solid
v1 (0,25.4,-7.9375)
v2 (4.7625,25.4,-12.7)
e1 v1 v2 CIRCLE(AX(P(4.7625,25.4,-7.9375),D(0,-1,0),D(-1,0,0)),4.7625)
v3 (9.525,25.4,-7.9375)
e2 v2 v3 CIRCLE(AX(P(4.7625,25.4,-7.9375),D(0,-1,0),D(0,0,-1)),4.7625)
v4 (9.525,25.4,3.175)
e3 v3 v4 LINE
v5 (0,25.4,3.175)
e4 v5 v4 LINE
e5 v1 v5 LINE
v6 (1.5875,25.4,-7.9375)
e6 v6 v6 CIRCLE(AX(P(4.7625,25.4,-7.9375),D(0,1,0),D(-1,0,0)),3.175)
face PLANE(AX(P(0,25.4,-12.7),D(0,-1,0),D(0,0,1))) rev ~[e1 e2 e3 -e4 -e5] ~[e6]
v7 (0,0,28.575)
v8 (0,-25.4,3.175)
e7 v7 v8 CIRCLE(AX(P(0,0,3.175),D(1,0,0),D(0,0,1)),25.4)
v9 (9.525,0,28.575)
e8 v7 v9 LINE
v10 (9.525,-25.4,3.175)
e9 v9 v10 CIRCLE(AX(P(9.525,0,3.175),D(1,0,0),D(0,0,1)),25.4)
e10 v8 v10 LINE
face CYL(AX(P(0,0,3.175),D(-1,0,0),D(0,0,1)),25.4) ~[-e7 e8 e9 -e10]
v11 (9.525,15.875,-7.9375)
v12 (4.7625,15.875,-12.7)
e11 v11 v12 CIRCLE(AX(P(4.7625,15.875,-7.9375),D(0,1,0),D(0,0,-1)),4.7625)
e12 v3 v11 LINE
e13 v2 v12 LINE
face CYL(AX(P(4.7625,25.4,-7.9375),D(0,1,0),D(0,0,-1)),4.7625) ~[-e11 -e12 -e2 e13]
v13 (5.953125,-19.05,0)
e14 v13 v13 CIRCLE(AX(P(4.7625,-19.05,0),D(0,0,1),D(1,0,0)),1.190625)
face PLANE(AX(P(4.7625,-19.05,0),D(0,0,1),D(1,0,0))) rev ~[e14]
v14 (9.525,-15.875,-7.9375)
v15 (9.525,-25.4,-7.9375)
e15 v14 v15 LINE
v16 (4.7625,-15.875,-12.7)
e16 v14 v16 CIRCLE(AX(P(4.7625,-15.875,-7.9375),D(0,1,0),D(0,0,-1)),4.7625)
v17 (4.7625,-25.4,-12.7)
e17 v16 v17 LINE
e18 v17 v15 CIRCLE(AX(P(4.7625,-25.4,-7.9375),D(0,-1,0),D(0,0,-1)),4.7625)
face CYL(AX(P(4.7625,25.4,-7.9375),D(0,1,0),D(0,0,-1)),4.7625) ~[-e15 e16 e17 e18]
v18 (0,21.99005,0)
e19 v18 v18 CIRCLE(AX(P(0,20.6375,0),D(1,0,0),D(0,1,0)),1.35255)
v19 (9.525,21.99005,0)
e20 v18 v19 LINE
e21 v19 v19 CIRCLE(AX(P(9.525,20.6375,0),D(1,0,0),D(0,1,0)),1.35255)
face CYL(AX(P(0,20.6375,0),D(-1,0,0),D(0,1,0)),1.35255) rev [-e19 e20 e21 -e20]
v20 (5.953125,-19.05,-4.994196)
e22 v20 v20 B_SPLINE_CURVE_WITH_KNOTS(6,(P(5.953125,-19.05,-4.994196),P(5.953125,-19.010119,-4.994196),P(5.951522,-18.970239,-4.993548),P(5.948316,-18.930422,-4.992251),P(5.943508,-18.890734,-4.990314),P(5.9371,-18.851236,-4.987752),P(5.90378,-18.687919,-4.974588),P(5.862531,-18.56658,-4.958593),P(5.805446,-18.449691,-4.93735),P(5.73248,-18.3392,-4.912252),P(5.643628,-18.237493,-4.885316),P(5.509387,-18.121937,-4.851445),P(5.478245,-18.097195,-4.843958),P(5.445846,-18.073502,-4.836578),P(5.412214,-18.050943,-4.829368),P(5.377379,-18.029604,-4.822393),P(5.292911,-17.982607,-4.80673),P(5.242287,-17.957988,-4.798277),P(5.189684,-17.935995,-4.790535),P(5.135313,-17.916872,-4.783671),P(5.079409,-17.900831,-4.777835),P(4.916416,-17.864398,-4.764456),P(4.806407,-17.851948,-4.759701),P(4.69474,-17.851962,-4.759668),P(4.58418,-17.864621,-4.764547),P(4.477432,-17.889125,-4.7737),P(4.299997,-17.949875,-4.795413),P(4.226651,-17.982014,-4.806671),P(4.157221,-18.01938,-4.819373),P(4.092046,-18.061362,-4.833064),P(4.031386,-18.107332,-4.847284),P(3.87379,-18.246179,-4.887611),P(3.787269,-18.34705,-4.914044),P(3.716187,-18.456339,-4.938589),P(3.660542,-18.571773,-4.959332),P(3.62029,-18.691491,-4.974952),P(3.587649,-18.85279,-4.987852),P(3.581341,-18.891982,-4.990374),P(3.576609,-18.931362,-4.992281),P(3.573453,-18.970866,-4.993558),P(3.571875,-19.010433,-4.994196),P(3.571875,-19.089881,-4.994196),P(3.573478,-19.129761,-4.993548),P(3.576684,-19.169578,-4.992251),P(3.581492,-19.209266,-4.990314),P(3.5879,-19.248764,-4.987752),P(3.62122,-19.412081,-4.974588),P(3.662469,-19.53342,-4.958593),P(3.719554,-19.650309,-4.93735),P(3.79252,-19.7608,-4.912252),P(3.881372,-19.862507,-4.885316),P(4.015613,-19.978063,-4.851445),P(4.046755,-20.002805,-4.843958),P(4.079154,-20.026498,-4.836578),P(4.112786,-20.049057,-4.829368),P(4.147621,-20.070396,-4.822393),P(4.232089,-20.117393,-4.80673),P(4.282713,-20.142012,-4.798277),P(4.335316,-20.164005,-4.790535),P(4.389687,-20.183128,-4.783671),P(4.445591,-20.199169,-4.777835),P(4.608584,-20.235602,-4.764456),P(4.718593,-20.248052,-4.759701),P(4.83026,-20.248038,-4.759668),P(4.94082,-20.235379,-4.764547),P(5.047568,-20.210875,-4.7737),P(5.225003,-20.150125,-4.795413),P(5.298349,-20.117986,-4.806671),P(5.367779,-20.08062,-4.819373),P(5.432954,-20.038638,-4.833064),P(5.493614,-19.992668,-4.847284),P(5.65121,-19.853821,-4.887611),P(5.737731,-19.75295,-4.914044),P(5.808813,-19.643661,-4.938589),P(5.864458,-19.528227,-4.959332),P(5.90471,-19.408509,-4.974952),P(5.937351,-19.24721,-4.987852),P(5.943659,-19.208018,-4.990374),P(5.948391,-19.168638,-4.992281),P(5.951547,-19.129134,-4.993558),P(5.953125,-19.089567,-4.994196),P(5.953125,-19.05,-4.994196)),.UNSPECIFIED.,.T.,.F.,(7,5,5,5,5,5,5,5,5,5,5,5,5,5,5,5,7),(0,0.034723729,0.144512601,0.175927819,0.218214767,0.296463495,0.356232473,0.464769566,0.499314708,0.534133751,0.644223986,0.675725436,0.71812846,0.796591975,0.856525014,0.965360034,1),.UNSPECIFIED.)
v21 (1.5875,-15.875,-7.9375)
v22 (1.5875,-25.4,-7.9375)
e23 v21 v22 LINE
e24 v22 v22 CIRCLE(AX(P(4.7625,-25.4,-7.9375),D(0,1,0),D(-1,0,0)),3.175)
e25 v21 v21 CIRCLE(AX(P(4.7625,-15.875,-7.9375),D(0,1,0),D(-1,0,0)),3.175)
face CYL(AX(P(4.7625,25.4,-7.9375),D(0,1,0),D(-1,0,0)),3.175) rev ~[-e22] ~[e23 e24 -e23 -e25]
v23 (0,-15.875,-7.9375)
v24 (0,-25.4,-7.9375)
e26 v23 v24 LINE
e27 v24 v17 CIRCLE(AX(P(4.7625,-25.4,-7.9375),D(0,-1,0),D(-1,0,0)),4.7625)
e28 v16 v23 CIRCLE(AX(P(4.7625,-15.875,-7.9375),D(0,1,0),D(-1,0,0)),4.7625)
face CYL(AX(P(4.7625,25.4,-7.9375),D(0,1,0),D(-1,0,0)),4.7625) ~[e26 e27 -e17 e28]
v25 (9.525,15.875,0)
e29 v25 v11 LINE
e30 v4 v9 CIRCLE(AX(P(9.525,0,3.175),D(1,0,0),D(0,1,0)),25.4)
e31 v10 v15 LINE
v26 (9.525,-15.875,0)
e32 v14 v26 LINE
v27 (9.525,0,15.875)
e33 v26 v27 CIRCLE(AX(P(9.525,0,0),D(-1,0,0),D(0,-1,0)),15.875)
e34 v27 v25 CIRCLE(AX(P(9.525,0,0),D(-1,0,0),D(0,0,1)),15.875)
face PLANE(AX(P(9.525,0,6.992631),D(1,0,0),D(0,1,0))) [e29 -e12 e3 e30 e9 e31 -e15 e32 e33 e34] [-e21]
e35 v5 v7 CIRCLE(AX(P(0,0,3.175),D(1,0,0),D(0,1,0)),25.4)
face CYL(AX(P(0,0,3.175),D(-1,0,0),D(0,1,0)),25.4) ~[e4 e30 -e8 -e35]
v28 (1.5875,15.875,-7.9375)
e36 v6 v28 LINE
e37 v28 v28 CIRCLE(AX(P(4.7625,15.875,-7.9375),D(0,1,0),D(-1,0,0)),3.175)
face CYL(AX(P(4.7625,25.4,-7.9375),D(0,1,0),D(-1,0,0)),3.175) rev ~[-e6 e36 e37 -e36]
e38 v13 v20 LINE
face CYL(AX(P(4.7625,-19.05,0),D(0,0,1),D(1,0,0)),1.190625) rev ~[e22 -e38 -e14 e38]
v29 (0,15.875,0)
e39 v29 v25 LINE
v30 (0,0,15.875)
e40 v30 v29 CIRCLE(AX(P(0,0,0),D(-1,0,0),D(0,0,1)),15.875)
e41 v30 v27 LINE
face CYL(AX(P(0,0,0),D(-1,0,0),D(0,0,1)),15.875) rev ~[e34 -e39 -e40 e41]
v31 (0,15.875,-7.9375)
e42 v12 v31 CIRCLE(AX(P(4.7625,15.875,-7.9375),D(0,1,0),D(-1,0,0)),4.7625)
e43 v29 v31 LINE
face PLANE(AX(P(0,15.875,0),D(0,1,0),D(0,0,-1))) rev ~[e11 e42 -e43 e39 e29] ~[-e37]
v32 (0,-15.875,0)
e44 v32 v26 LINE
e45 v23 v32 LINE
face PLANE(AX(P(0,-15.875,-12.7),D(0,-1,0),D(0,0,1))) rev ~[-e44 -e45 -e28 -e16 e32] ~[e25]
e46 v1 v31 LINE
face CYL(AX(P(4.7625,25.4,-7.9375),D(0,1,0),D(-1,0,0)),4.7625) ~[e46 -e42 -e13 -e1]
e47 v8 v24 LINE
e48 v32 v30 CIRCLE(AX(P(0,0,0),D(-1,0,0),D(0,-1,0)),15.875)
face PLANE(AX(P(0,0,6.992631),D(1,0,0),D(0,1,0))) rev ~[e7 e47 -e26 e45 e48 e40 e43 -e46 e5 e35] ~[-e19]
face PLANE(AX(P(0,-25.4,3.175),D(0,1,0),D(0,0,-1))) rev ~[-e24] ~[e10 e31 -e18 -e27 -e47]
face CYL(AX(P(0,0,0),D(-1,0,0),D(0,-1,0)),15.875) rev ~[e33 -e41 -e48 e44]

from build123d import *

# Parameters (mm, degrees)
F0_R     = 1.35255
F1_DEPTH = 9.525
F2_R     = 3.175
F3_DEPTH = 50.8
F4_R     = 1.190625
F5_DEPTH = 6.35


# Not quite as in the source:
# - a feature names something its author has since deleted; it is built from what else it names


with BuildPart() as f1:
    # F0 (on Right) → F1 (new body)
    with BuildSketch(Plane.YZ):
        with BuildLine():
            Line((-15.875, -12.7), (-15.875, 0))
            ThreePointArc((-15.875, 0), (-11.2253201513, 11.2253201513), (0, 15.875))
            ThreePointArc((0, 15.875), (11.2253201513, 11.2253201513), (15.875, 0))
            Line((15.875, 0), (15.875, -12.7))
            Line((15.875, -12.7), (25.4, -12.7))
            Line((25.4, -12.7), (25.4, 0))
            Line((25.4, 0), (25.4, 3.175))
            ThreePointArc((25.4, 3.175), (17.9605122421, 21.1355122421), (0, 28.575))
            ThreePointArc((0, 28.575), (-17.9605122421, 21.1355122421), (-25.4, 3.175))
            Line((-25.4, 3.175), (-25.4, 0))
            Line((-25.4, 0), (-25.4, -12.7))
            Line((-25.4, -12.7), (-15.875, -12.7))
        make_face()
        with Locations((20.6375, 0)):
            Circle(F0_R, mode=Mode.SUBTRACT)
    extrude(amount=F1_DEPTH)

    # F2 (on face) → F3 (cut)
    with BuildSketch(Plane(origin=(0, 25.4, 0), x_dir=(-1, 0, 0), z_dir=(0, 1, 0))):
        with Locations((-4.7625, -7.9375)):
            Circle(F2_R)
        with BuildLine():
            ThreePointArc((-4.7625, -12.7), (-8.1300960454, -11.3050960454), (-9.525, -7.9375))
            Line((-9.525, -7.9375), (-9.525, -12.7))
            Line((-9.525, -12.7), (-4.7625, -12.7))
        make_face()
        with BuildLine():
            ThreePointArc((0, -7.9375), (-1.3949039546, -11.3050960454), (-4.7625, -12.7))
            Line((-4.7625, -12.7), (0, -12.7))
            Line((0, -12.7), (0, -7.9375))
        make_face()
    extrude(amount=-F3_DEPTH, mode=Mode.SUBTRACT)

    # F4 (on Top) → F5 (cut)
    with BuildSketch(Plane.XY):
        with Locations((4.7625, -19.05)):
            Circle(F4_R)
    extrude(amount=-F5_DEPTH, mode=Mode.SUBTRACT)


solid = f1.part
